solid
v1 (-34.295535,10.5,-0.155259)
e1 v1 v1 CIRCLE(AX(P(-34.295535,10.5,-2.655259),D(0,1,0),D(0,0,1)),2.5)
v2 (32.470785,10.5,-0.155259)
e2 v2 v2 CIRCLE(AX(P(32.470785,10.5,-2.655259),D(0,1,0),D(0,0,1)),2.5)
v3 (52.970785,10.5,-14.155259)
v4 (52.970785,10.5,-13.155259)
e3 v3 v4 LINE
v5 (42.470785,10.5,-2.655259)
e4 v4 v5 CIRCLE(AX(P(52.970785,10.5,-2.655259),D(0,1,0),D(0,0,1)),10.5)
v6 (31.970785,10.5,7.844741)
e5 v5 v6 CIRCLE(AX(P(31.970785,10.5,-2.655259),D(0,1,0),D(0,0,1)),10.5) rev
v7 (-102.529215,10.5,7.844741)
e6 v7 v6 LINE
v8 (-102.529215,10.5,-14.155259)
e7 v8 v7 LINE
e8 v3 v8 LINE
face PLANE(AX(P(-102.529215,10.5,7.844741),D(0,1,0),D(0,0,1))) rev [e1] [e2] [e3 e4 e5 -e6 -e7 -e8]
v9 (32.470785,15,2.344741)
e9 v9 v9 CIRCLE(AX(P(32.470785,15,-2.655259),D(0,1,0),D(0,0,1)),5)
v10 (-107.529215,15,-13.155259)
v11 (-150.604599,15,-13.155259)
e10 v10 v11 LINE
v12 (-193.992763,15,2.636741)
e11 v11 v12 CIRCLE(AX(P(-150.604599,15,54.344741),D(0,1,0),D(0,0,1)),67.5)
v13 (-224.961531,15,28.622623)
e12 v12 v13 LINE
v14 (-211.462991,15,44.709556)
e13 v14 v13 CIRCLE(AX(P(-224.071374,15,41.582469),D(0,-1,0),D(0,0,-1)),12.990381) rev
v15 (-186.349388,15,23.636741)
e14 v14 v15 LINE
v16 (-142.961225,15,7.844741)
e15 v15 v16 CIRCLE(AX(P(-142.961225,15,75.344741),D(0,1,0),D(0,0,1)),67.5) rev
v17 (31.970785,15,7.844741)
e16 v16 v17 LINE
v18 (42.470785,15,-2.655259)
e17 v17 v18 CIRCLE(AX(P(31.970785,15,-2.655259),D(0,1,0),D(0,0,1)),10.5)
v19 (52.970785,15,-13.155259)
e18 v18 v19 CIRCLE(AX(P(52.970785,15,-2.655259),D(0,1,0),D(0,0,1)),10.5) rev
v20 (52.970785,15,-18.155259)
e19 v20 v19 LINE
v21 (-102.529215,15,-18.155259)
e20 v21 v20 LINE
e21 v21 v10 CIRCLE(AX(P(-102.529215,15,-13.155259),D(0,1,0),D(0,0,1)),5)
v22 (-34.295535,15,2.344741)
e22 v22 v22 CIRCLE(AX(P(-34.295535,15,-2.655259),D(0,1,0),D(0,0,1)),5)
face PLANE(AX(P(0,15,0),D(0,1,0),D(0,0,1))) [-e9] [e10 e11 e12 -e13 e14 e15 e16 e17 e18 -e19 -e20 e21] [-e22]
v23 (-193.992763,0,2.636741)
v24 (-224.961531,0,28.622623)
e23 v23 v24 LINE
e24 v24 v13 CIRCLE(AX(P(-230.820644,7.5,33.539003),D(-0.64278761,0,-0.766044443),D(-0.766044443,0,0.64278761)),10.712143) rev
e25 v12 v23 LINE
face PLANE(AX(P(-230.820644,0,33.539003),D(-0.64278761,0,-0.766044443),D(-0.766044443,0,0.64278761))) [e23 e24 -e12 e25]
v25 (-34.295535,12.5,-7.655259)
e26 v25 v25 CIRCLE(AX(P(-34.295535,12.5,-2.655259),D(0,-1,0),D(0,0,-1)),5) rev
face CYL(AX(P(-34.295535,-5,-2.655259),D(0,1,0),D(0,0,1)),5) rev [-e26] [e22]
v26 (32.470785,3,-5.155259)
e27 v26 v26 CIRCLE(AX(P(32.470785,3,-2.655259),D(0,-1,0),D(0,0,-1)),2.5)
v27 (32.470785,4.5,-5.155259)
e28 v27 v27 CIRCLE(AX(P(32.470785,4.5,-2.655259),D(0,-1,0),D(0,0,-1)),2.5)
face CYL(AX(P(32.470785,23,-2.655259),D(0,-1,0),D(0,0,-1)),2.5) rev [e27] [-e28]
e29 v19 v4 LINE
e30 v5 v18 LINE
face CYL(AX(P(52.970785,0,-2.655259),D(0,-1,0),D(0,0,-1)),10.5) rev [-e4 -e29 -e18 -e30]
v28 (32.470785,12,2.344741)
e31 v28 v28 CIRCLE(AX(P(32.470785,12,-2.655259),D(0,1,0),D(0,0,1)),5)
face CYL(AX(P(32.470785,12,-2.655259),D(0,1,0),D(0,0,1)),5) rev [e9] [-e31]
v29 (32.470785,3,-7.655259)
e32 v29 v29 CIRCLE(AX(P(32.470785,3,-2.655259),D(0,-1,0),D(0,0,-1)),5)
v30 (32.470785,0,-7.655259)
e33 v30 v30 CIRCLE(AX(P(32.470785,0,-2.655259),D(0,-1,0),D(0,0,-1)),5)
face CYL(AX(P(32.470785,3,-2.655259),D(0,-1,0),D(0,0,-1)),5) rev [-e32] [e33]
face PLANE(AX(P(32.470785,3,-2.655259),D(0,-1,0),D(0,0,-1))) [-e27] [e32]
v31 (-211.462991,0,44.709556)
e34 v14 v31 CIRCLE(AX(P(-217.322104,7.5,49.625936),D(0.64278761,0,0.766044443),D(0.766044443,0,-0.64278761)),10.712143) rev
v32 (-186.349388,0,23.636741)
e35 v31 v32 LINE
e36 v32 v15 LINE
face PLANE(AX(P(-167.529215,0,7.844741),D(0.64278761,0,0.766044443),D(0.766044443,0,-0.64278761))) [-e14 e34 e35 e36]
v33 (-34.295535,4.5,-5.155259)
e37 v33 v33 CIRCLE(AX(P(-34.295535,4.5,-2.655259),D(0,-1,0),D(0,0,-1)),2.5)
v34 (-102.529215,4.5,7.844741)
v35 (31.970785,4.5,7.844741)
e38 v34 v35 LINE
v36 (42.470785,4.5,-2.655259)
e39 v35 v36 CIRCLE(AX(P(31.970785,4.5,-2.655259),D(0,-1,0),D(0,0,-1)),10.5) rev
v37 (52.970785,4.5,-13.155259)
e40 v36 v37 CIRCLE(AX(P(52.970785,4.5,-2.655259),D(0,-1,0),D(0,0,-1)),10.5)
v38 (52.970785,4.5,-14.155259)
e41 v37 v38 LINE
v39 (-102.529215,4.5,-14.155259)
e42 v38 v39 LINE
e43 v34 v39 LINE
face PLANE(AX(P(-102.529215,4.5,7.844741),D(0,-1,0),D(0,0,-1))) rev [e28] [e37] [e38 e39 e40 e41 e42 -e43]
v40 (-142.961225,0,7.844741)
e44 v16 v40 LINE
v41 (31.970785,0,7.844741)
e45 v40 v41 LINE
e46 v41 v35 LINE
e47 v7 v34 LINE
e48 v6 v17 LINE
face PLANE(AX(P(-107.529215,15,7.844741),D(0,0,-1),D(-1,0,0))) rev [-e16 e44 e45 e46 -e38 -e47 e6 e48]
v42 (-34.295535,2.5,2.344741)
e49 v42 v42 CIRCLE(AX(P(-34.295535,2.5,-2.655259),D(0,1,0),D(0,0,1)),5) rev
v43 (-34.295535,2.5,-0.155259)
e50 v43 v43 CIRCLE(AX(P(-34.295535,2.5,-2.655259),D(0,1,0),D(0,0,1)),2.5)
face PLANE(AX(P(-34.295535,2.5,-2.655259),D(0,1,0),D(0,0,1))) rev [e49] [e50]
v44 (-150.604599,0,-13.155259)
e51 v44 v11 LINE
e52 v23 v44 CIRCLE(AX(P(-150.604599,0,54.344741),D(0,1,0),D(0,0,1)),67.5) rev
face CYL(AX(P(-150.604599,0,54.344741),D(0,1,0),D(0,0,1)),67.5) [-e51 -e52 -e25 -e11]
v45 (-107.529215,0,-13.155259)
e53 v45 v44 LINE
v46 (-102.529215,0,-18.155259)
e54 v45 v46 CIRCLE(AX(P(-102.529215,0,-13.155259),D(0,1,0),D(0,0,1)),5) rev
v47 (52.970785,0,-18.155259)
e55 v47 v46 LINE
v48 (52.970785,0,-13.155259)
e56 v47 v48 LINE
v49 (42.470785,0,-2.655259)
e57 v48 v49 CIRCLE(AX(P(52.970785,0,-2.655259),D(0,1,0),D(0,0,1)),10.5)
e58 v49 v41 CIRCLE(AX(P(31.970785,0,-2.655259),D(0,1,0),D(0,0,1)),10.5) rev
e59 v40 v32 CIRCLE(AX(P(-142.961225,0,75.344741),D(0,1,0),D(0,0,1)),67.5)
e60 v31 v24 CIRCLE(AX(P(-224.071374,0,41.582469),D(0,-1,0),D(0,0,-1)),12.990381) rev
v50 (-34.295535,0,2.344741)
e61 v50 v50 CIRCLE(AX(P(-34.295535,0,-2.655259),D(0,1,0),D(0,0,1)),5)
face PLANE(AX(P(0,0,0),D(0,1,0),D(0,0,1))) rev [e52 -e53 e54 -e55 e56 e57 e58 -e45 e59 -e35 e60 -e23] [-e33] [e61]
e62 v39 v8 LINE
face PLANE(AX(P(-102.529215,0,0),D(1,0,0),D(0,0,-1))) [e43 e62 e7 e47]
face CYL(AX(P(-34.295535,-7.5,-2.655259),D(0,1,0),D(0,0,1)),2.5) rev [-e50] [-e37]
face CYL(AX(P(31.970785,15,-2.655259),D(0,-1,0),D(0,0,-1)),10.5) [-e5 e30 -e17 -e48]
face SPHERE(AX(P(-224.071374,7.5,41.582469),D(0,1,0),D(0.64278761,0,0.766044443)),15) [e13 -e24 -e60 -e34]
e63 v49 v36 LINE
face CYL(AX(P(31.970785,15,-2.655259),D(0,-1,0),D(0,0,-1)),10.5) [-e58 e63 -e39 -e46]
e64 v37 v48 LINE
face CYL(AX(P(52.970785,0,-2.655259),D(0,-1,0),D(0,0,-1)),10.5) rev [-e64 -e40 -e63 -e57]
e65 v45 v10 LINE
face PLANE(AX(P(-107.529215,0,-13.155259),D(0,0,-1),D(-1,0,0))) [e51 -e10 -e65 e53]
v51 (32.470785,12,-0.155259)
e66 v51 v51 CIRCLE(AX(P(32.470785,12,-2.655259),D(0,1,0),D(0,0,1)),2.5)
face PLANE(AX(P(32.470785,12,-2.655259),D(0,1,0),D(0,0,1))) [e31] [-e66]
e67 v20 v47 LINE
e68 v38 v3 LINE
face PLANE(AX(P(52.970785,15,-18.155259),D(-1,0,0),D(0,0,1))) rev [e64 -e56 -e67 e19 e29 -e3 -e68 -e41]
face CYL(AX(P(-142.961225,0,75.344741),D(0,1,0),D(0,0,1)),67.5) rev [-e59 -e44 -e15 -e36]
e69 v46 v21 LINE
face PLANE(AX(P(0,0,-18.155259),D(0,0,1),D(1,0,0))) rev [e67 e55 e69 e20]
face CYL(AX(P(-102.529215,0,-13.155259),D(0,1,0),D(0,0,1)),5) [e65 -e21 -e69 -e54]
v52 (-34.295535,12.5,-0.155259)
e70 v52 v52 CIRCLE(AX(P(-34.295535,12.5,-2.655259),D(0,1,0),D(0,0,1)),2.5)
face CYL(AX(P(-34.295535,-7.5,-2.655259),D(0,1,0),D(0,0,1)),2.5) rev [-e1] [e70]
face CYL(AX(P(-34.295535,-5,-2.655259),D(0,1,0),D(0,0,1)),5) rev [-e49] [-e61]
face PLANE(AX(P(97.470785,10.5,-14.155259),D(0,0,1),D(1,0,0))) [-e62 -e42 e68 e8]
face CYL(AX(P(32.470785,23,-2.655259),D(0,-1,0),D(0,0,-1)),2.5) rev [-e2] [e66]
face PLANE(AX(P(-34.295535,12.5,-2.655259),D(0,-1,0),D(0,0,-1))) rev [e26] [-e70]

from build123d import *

# Parameters (mm, degrees)
SKETCH_1_W          = 150
SKETCH_1_H          = 21.000000000000004
EXTRUDE_1_DEPTH     = 15
CUT_EXTRUDE_1_DEPTH = 145
SKETCH_3_R          = 5.000000000000004
CUT_EXTRUDE_2_DEPTH = 3
CUT_EXTRUDE_START   = -3
SKETCH_4_R          = 5.000000000000001
CUT_EXTRUDE_3_DEPTH = 3
SKETCH_5_R          = 2.4999999999999987
CUT_EXTRUDE_4_DEPTH = 20
SKETCH_6_R          = 5.000000000000001
CUT_EXTRUDE_5_DEPTH = 20
SKETCH_7_R          = 5.999999999999998
EXTRUDE_2_DEPTH     = 2
SKETCH_8_R          = 6.000000000000003
EXTRUDE_3_DEPTH     = 2
SKETCH_9_R          = 2.500000000000002
CUT_EXTRUDE_6_DEPTH = 20
EXTRUDE_5_DEPTH     = 15
EXTRUDE_6_DEPTH     = 5
FILLET_1_R          = 5
FILLET_2_R          = 10.5
FILLET_3_R          = 67.5
SKETCH_17_W         = 22.000000000000004
SKETCH_17_H         = 5.999999999999995
CUT_EXTRUDE_7_DEPTH = 200


with BuildPart() as part:
    # 草图1 → 凸台-拉伸1 (new body)
    with BuildSketch(Plane(origin=(0, 0, 0), x_dir=(1, 0, 0), z_dir=(0, 1, 0))):
        with Locations((-32.52921535893155, 2.6552587646076753)):
            Rectangle(SKETCH_1_W, SKETCH_1_H)
    extrude(amount=EXTRUDE_1_DEPTH)

    # 草图2 → 切除-拉伸1 (cut)
    with BuildSketch(Plane(origin=(42.470784641068455, 0, 0), x_dir=(0, 0, -1), z_dir=(1, 0, 0))):
        Polygon((-7.844741235392326, 10.499999999999998), (13.155258764607675, 10.499999999999998), (13.155258764607675, 4.500000000000001), (-7.844741235392326, 4.5), align=None)
    extrude(amount=-CUT_EXTRUDE_1_DEPTH, mode=Mode.SUBTRACT)

    # 草图3 → 切除-拉伸2 (cut)
    with BuildSketch(Plane(origin=(0, 15, 0), x_dir=(1, 0, 0), z_dir=(0, 1, 0))):
        with Locations(Location((32.47078464106845, 2.655258764607675, 0), (0, 0, 270))):
            Circle(SKETCH_3_R)
    extrude(amount=-CUT_EXTRUDE_2_DEPTH, mode=Mode.SUBTRACT)

    # 草图4 → 切除-拉伸3 (cut)
    with BuildSketch(Plane(origin=(0, 0, 0), x_dir=(-1, 0, 0), z_dir=(0, -1, 0)).offset(CUT_EXTRUDE_START)):
        with Locations(Location((-32.47078464106845, 2.655258764607675, 0), (0, 0, 270))):
            Circle(SKETCH_4_R)
    extrude(amount=CUT_EXTRUDE_3_DEPTH, mode=Mode.SUBTRACT)

    # 草图5 → 切除-拉伸4 (cut)
    with BuildSketch(Plane(origin=(0, 3, 0), x_dir=(-1, 0, 0), z_dir=(0, -1, 0))):
        with Locations(Location((-32.47078464106845, 2.655258764607675, 0), (0, 0, 270))):
            Circle(SKETCH_5_R)
    extrude(amount=-CUT_EXTRUDE_4_DEPTH, mode=Mode.SUBTRACT)

    # 草图6 → 切除-拉伸5 (cut)
    with BuildSketch(Plane(origin=(0, 15, 0), x_dir=(1, 0, 0), z_dir=(0, 1, 0))):
        with Locations(Location((-34.295534758931545, 2.655258764607675, 0), (0, 0, 270))):
            Circle(SKETCH_6_R)
    extrude(amount=-CUT_EXTRUDE_5_DEPTH, mode=Mode.SUBTRACT)

    # 草图7 → 凸台-拉伸2 (add)
    with BuildSketch(Plane(origin=(0, 4.5, 1.9e-16), x_dir=(1, 0, 0), z_dir=(0, 1, 4e-17))):
        with Locations((-34.295534758931545, 2.655258764607675)):
            Circle(SKETCH_7_R)
    extrude(amount=-EXTRUDE_2_DEPTH)

    # 草图8 → 凸台-拉伸3 (add)
    with BuildSketch(Plane(origin=(0, 10.499999999999998, 0), x_dir=(-1, 0, 0), z_dir=(0, -1, 0))):
        with Locations((34.295534758931545, 2.655258764607675)):
            Circle(SKETCH_8_R)
    extrude(amount=-EXTRUDE_3_DEPTH)

    # 草图9 → 切除-拉伸6 (cut)
    with BuildSketch(Plane(origin=(0, 12.499999999999998, 0), x_dir=(1, 0, 0), z_dir=(0, 1, 0))):
        with Locations(Location((-34.295534758931545, 2.655258764607675, 0), (0, 0, 270))):
            Circle(SKETCH_9_R)
    extrude(amount=-CUT_EXTRUDE_6_DEPTH, mode=Mode.SUBTRACT)



with BuildPart() as body_2:
    # 草图12 → 凸台-拉伸5 (new body)
    with BuildSketch(Plane(origin=(0, 15, 0), x_dir=(1, 0, 0), z_dir=(0, 1, 0))):
        Polygon((-107.52921535893154, -7.844741235392326), (-167.52921535893154, -7.844741235392335), (-217.32210416166507, -49.62593586501747), (-230.82064396508238, -33.53900255951896), (-175.17259027852143, 13.155258764607666), (-107.52921535893154, 13.155258764607675), align=None)
    extrude(amount=-EXTRUDE_5_DEPTH)

    # 草图13 → 旋转3 (revolve)
    with BuildSketch(Plane(origin=(-151.96584895321814, 0, 127.51448780818791), x_dir=(0.6427876096865401, 0, 0.7660444431189775), z_dir=(-0.7660444431189775, 0, 0.6427876096865401))):
        with BuildLine():
            Line((-112.17628346215061, 22.5), (-112.17628346215061, -7.5))
            ThreePointArc((-112.17628346215061, -7.5), (-97.17628346215061, 7.5), (-112.17628346215061, 22.5))
        make_face()
    revolve(axis=Axis((-224.0713740633737, 22.5, 41.58246921226819), (0, -1, 0)))


with BuildPart() as part_1:
    add(part.part)

    add(body_2.part)  # 凸台-拉伸6 merges body 2
    # 草图14 → 凸台-拉伸6 (add)
    with BuildSketch(Plane(origin=(0, 0, -13.155258764607675), x_dir=(-1, 0, 0), z_dir=(0, 0, -1))):
        Polygon((107.52921535893154, 15), (-52.97078464106847, 14.99999999999998), (-52.97078464106847, -3.99e-14), (107.52921535893154, 0), align=None)
    extrude(amount=EXTRUDE_6_DEPTH)

    # 圆角1
    fillet_1_edges = [part_1.edges().sort_by_distance(p)[0] for p in [
        (-107.52921535893154, 7.5, -18.155258764607673),
    ]]
    fillet(fillet_1_edges, radius=FILLET_1_R - 0.0001)  # a hair under: the kernel refuses the full size

    # 圆角2
    fillet_2_edges = [part_1.edges().sort_by_distance(p)[0] for p in [
        (42.470784641068455, 12.75, -13.155258764607675),
    ]]
    fillet(fillet_2_edges, radius=FILLET_2_R - 0.0001)  # a hair under: the kernel refuses the full size
    fillet_2_2_edges = [part_1.edges().sort_by_distance(p)[0] for p in [
        (42.470784641068455, 2.2500000000000004, -13.155258764607675),
    ]]
    fillet(fillet_2_2_edges, radius=FILLET_2_R - 0.0001)  # a hair under: the kernel refuses the full size
    fillet_2_3_edges = [part_1.edges().sort_by_distance(p)[0] for p in [
        (42.470784641068455, 2.25, 7.844741235392326),
    ]]
    fillet(fillet_2_3_edges, radius=FILLET_2_R)
    fillet_2_4_edges = [part_1.edges().sort_by_distance(p)[0] for p in [
        (42.470784641068455, 12.75, 7.844741235392326),
    ]]
    fillet(fillet_2_4_edges, radius=FILLET_2_R)

    # 圆角3
    fillet_3_edges = [part_1.edges().sort_by_distance(p)[0] for p in [
        (-167.52921535893154, 7.5, 7.844741235392335),
        (-175.17259027852143, 7.5, -13.155258764607666),
    ]]
    fillet(fillet_3_edges, radius=FILLET_3_R)

    # 草图17 → 切除-拉伸7 (cut)
    with BuildSketch(Plane(origin=(-102.52921535893152, 0, 0), x_dir=(0, 0, -1), z_dir=(1, 0, 0))):
        with Locations((3.1552587646076753, 7.500000000000001)):
            Rectangle(SKETCH_17_W, SKETCH_17_H)
    extrude(amount=CUT_EXTRUDE_7_DEPTH, mode=Mode.SUBTRACT)


solid = part_1.part
